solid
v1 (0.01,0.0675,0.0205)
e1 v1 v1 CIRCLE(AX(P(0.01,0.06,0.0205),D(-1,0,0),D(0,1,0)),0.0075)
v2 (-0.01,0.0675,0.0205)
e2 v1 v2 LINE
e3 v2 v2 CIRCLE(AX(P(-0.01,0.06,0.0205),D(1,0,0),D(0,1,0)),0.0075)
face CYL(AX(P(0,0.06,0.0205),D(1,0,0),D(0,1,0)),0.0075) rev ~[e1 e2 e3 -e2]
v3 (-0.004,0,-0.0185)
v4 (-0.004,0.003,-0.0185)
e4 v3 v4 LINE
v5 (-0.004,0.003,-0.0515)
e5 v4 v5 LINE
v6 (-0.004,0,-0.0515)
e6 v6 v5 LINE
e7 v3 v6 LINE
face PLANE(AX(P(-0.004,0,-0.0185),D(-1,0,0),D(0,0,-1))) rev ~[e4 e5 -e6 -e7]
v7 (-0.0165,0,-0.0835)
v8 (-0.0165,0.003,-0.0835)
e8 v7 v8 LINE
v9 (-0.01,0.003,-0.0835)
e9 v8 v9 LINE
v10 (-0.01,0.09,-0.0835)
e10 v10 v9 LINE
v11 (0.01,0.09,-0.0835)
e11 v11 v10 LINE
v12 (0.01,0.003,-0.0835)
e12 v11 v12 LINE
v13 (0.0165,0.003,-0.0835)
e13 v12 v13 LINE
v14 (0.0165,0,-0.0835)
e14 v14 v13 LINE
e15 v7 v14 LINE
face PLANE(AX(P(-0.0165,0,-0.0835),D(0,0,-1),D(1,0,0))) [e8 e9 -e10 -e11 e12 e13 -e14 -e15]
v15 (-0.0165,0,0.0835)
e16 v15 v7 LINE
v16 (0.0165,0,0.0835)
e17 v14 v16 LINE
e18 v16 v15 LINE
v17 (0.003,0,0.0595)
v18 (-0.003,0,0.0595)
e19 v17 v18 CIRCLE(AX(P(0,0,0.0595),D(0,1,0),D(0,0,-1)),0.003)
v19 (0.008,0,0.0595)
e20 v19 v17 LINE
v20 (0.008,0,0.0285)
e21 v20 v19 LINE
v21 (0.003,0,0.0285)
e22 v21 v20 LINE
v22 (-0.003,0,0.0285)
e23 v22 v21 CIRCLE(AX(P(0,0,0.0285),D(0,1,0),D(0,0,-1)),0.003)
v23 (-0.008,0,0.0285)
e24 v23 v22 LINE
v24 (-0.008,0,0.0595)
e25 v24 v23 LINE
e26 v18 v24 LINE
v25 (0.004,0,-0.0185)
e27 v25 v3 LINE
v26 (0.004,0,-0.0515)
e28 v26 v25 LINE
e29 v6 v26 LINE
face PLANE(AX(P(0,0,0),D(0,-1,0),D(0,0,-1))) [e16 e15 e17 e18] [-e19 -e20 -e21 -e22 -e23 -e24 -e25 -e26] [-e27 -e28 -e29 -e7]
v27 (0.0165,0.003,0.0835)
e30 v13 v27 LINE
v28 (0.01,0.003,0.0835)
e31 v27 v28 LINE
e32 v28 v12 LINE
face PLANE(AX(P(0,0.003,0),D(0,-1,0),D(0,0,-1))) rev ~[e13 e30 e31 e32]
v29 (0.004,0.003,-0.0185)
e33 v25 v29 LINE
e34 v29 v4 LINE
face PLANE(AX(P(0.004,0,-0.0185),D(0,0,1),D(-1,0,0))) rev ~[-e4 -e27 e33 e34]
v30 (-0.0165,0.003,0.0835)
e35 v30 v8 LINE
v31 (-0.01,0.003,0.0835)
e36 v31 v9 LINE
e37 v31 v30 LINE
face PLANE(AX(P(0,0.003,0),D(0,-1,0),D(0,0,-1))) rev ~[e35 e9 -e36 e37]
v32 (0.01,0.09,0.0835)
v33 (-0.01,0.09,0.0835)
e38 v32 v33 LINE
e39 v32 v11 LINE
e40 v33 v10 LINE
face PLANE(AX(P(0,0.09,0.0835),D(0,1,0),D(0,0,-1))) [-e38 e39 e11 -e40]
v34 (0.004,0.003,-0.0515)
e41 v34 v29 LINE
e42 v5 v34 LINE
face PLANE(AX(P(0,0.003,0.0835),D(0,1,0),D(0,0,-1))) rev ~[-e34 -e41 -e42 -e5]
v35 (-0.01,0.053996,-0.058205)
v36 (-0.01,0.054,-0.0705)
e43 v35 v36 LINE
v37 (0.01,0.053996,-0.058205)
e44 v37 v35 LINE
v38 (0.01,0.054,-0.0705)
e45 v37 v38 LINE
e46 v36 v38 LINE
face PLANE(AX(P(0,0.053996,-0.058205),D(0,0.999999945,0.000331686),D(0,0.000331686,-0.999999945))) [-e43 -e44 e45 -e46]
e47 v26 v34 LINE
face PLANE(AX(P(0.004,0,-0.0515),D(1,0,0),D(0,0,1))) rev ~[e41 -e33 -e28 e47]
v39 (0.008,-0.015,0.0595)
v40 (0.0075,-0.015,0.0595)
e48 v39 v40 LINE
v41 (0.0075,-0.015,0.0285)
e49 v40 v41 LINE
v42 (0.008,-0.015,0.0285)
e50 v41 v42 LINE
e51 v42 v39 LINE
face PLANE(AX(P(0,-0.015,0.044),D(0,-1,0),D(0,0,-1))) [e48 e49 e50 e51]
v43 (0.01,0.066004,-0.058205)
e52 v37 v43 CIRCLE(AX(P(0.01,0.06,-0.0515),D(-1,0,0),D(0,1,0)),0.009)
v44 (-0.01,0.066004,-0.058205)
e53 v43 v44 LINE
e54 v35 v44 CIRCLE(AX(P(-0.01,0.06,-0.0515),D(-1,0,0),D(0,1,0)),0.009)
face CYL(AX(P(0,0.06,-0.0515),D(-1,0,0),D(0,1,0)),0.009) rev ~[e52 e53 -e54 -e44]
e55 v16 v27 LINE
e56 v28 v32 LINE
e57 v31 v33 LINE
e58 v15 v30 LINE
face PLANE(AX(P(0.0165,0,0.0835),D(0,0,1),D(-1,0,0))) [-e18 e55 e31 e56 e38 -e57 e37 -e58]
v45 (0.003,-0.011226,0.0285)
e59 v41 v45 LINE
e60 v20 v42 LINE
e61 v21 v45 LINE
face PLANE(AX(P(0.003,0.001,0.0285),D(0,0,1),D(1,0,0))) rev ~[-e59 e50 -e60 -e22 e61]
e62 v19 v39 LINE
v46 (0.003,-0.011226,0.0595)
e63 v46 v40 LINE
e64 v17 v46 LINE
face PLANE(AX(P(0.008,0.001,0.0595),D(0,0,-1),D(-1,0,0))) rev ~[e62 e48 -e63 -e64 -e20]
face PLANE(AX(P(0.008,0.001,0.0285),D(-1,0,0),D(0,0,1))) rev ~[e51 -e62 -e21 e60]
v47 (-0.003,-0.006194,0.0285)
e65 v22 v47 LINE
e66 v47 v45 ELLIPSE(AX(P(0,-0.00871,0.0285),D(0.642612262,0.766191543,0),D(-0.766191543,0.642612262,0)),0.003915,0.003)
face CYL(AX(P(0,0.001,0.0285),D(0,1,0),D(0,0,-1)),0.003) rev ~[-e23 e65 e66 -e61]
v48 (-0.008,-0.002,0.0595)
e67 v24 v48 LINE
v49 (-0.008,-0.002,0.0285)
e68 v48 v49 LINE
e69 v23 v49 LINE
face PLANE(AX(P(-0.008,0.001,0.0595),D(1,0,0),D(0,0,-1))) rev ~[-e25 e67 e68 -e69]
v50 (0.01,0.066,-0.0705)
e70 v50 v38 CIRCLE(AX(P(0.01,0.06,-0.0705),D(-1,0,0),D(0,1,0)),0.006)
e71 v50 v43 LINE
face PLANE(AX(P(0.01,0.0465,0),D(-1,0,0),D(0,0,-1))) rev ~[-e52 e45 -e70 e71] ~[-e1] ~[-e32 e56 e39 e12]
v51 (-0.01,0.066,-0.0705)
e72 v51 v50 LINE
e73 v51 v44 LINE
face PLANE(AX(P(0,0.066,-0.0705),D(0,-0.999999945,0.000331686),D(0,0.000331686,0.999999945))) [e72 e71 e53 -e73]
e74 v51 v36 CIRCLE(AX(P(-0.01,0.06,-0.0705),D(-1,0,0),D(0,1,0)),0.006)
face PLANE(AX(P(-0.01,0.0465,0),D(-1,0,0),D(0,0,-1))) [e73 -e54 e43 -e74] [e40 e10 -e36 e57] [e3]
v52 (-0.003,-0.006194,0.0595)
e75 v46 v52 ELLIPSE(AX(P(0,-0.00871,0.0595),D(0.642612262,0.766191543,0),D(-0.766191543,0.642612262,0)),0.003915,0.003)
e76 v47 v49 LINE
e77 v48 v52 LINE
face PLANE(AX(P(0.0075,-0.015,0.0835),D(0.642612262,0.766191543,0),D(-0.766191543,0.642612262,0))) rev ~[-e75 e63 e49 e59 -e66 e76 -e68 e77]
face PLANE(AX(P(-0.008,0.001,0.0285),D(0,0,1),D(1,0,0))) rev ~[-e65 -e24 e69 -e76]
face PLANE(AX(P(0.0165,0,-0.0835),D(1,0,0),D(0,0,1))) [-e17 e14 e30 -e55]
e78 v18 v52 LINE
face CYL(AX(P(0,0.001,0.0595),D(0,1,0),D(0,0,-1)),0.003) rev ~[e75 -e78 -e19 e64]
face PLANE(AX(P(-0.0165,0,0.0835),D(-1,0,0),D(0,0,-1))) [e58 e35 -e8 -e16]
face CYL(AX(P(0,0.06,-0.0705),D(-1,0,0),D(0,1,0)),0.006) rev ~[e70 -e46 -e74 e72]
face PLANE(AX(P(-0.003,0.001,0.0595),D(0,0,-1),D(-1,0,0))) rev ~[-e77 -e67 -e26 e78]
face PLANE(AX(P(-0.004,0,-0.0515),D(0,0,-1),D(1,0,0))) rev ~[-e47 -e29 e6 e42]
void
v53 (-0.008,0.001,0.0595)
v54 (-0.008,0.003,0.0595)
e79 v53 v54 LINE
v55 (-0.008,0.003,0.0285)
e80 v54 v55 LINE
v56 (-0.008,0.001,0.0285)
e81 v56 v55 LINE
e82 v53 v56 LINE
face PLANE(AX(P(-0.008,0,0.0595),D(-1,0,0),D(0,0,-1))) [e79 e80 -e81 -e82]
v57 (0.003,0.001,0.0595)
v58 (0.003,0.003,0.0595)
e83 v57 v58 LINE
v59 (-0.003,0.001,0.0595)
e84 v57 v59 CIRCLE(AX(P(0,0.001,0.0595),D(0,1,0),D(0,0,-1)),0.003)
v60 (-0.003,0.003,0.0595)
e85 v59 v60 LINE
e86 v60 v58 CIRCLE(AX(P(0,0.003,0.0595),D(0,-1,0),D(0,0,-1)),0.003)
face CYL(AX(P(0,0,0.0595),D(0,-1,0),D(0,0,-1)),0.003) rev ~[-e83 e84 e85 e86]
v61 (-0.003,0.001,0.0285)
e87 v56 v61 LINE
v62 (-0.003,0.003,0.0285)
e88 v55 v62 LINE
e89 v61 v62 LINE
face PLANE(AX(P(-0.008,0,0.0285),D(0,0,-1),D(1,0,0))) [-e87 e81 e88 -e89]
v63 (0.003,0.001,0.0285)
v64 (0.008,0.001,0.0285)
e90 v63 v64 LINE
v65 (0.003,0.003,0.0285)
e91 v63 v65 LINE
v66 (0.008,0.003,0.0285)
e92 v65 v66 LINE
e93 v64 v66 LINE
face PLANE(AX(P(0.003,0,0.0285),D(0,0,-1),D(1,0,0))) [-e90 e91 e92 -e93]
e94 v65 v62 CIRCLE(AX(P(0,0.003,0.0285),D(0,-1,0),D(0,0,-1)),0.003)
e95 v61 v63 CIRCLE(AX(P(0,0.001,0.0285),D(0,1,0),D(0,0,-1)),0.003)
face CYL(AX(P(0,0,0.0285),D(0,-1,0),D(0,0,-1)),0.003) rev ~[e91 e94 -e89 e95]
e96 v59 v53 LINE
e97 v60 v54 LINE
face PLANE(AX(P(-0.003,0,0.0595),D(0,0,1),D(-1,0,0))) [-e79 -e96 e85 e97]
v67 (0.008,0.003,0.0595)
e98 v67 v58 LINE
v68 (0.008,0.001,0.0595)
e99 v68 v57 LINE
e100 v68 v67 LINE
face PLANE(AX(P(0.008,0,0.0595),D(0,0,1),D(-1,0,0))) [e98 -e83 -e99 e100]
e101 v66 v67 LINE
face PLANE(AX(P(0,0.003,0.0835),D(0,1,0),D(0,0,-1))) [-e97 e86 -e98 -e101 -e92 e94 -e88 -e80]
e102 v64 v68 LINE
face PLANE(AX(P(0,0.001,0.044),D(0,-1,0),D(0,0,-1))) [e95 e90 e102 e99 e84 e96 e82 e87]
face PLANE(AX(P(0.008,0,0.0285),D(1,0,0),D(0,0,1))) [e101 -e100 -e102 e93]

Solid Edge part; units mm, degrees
sketch "Sketch1" plane through (0, 0, 0) normal (0, -1, 0) x (1, 0, 0)
  line L0 (-0.0165, -0.0835) -> (0.0165, -0.0835)
  line L1 (0.0165, -0.0835) -> (0.0165, 0.0835)
  line L2 (0.0165, 0.0835) -> (-0.0165, 0.0835)
  line L3 (-0.0165, 0.0835) -> (-0.0165, -0.0835)
  dimension "D1" = 0.167
  dimension "D2" = 0.033
extrude "Protrusion1" add sketch "Sketch1" against normal blind 0.003
sketch "Sketch2" plane through (0, 0, 0) normal (0, -1, 0) x (0, 0, -1)
  line L0 (-0.0595, -0.008) -> (-0.0285, -0.008)
  line L1 (-0.0285, -0.008) -> (-0.0285, -0.003)
  line L2 (-0.0285, 0.003) -> (-0.0285, 0.008)
  line L3 (-0.0285, 0.008) -> (-0.0595, 0.008)
  line L4 (-0.0595, 0.008) -> (-0.0595, 0.003)
  line L5 (-0.0595, -0.003) -> (-0.0595, -0.008)
  arc A0 (-0.0595, 0.003) -> (-0.0595, -0.003) centre (-0.0595, 0) cw
  arc A1 (-0.0285, -0.003) -> (-0.0285, 0.003) centre (-0.0285, 0) cw
  line L6 (0.0185, -0.004) -> (0.0515, -0.004)
  line L7 (0.0515, -0.004) -> (0.0515, 0.004)
  line L8 (0.0515, 0.004) -> (0.0185, 0.004)
  line L9 (0.0185, 0.004) -> (0.0185, -0.004)
  dimension "D1" = 0.0515
  dimension "D2" = 0.0515
  dimension "D3" = 0.0285
  dimension "D4" = 0.0285
extrude "Cutout1" cut sketch "Sketch2" against normal through all
sketch "Sketch3" plane through (0, 0, 0) normal (1, 0, 0) x (0, 1, 0)
  line L0 (0.003, 0.0835) -> (0.09, 0.0835)
  line L1 (0.09, 0.0835) -> (0.09, -0.0835)
  line L2 (0.09, -0.0835) -> (0.003, -0.0835)
  line L3 (0.003, 0.0835) -> (0.003, -0.0835)
  dimension "D1" = 0.167
  dimension "D2" = 0.09
extrude "Ausprägung_2" add sketch "Sketch3" along normal mid plane 0.02
sketch "Sketch4" plane through (0, 0, 0) normal (1, 0, 0) x (0, 1, 0)
  circle A0 centre (0.06, 0.0205) radius 0.0075
  line L0 (0.054, -0.0582) -> (0.054, -0.0705)
  arc A1 (0.066, -0.0582) -> (0.054, -0.0582) centre (0.06, -0.0515) ccw
  line L1 (0.066, -0.0705) -> (0.066, -0.0582)
  arc A2 (0.054, -0.0705) -> (0.066, -0.0705) centre (0.06, -0.0705) ccw
extrude "Cutout2" cut sketch "Sketch4" along normal through all and the other way through all
sketch "Sketch5" plane through (0, 0.001, 0) normal (0, -1, 0) x (0, 0, -1)
  line L0 (-0.0285, 0.003) -> (-0.0285, 0.008)
  line L1 (-0.0285, 0.008) -> (-0.0595, 0.008)
  line L2 (-0.0595, 0.008) -> (-0.0595, 0.003)
  arc A0 (-0.0595, 0.003) -> (-0.0595, -0.003) centre (-0.0595, 0) cw
  line L3 (-0.0595, -0.003) -> (-0.0595, -0.008)
  line L4 (-0.0595, -0.008) -> (-0.0285, -0.008)
  line L5 (-0.0285, -0.008) -> (-0.0285, -0.003)
  arc A1 (-0.0285, -0.003) -> (-0.0285, 0.003) centre (-0.0285, 0) cw
extrude "Ausprägung_4" add sketch "Sketch5" along normal blind 0.016
sketch "Sketch6" plane through (0, 0.045, 0.0835) normal (0, 0, 1) x (1, 0, 0)
  line L0 (-0.008, -0.06) -> (0.0075, -0.06)
  line L1 (0.0075, -0.06) -> (-0.008, -0.047)
  line L2 (-0.008, -0.06) -> (-0.008, -0.047)
  dimension "D1" = 0.002
  dimension "D2" = 0.0005
extrude "Cutout3" cut sketch "Sketch6" against normal through all
